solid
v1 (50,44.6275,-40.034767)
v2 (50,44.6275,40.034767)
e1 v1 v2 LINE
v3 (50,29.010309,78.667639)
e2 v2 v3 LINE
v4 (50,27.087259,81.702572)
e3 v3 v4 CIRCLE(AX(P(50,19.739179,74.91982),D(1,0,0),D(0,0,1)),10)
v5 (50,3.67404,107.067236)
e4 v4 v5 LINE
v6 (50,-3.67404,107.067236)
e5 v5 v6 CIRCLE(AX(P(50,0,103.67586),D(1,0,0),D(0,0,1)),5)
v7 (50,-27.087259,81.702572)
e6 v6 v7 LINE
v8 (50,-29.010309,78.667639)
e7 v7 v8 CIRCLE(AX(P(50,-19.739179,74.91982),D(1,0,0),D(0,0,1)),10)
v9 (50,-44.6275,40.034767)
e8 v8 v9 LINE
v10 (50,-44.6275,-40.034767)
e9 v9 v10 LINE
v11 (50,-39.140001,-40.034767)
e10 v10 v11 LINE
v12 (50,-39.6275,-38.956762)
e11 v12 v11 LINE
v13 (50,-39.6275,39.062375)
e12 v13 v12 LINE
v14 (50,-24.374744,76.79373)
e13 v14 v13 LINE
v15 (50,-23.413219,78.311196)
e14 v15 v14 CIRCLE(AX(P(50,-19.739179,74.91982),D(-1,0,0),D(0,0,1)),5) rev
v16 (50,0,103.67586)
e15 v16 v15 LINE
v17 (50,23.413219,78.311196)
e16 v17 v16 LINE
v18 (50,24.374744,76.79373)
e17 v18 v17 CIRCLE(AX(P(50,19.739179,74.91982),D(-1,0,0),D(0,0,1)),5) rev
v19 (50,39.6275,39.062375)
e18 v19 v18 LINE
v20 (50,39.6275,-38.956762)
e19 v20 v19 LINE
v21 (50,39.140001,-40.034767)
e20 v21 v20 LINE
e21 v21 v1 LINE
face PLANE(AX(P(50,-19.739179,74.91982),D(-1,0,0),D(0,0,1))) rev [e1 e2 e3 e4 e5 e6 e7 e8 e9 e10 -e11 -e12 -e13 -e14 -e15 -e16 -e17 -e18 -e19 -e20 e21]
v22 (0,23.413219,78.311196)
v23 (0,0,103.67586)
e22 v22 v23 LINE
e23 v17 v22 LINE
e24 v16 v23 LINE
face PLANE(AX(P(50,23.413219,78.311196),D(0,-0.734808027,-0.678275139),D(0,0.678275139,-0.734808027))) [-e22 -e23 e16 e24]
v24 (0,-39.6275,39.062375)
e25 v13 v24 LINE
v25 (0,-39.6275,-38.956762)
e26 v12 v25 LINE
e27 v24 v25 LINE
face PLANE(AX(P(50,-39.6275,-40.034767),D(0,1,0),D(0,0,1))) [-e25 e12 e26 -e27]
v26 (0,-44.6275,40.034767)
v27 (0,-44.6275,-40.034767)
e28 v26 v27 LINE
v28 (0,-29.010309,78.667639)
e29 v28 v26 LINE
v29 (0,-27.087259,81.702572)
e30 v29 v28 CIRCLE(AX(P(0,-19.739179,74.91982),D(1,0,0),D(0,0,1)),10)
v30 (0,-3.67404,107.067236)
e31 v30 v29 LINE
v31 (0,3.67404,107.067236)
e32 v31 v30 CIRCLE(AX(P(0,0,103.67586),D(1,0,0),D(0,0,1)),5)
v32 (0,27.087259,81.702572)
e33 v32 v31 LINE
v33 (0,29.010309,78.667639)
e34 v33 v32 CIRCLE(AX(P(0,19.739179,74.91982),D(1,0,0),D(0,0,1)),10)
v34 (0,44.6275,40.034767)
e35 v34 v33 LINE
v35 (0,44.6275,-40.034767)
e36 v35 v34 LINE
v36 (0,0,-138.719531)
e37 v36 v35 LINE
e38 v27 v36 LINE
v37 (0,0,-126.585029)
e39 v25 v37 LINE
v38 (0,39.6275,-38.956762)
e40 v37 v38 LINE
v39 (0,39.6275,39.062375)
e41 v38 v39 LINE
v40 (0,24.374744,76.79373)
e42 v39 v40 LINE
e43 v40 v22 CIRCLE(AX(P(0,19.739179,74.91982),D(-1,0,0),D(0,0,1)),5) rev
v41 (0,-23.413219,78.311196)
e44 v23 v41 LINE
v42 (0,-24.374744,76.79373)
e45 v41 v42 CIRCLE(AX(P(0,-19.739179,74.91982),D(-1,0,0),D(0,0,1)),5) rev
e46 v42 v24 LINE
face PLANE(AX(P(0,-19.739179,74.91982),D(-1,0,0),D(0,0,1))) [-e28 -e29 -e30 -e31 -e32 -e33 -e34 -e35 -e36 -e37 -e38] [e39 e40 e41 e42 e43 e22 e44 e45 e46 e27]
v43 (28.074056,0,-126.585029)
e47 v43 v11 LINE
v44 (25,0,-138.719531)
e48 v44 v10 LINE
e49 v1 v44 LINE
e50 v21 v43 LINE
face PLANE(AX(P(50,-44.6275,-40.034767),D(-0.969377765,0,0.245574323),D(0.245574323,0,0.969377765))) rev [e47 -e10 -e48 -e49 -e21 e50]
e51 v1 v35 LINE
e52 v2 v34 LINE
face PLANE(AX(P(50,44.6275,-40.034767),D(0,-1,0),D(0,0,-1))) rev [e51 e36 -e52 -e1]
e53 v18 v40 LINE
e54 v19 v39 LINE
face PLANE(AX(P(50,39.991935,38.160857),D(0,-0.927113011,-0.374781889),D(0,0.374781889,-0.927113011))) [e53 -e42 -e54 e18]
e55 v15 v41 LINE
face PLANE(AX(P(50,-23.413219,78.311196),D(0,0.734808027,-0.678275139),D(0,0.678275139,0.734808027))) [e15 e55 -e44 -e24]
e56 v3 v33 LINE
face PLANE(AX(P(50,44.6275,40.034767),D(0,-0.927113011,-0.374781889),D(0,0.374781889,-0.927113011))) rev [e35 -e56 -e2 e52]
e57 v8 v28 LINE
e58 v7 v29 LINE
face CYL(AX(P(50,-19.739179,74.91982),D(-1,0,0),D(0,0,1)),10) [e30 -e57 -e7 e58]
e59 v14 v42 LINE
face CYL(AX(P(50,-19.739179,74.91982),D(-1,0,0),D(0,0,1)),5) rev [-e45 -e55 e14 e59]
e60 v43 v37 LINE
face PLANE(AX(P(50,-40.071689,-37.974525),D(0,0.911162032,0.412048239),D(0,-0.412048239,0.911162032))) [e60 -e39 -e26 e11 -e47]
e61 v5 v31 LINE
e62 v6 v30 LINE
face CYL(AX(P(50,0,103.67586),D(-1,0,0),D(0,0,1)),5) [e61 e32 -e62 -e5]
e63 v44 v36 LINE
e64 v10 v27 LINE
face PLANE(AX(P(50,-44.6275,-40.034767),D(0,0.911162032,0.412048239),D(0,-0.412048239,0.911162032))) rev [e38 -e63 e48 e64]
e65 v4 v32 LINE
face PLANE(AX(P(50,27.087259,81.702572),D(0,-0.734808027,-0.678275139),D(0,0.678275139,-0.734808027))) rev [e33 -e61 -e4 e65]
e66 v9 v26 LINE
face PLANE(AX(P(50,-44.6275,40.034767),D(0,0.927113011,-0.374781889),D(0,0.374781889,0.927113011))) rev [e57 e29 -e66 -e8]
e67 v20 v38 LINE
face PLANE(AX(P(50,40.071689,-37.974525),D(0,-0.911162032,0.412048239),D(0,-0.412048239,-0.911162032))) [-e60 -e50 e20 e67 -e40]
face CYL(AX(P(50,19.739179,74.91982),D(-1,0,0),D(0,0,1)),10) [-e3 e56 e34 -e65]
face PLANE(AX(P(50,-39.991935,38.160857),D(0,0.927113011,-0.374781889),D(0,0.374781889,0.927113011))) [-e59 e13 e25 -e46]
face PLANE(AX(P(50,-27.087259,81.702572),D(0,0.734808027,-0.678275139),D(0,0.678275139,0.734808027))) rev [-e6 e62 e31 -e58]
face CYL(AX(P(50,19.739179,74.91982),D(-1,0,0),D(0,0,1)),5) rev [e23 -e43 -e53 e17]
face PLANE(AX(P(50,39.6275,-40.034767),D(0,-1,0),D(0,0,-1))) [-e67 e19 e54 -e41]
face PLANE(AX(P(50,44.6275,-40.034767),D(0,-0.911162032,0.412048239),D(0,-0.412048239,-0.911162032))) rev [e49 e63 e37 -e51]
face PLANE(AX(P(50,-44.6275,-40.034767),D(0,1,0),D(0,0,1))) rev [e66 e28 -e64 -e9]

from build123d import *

# Parameters (mm, degrees)
BOSS_EXTRUDE1_DEPTH = 50
SHELL1_DEPTH        = 50
CUT_EXTRUDE2_DEPTH  = 173.364622498


# Read off the part's stored shape, not the designer's step: Shell1
with BuildPart() as part:
    # Sketch1 → Boss-Extrude1 (new body)
    with BuildSketch(Plane.YZ):
        with BuildLine():
            Line((-44.627499653, -40.034766679), (-44.627499653, 40.034766679))
            Line((-44.627499653, 40.034766679), (-29.010308673, 78.667639283))
            ThreePointArc((-29.010308673, 78.667639283), (-28.186204205, 80.272180413), (-27.087258828, 81.702571783))
            Line((-27.087258828, 81.702571783), (-3.674040134, 107.06723584))
            ThreePointArc((-3.674040134, 107.06723584), (0, 108.675860147), (3.674040134, 107.06723584))
            Line((3.674040134, 107.06723584), (27.087258828, 81.702571783))
            ThreePointArc((27.087258828, 81.702571783), (28.186204205, 80.272180413), (29.010308673, 78.667639283))
            Line((29.010308673, 78.667639283), (44.627499653, 40.034766679))
            Line((44.627499653, 40.034766679), (44.627499653, -40.034766679))
            Line((44.627499653, -40.034766679), (0, -138.719530665))
            Line((0, -138.719530665), (-44.627499653, -40.034766679))
        make_face()
    extrude(amount=BOSS_EXTRUDE1_DEPTH)

    # Shell1 outline → Shell1 (cut)
    with BuildSketch(Plane.YZ):
        with BuildLine():
            Line((-24.374743616, 76.79372984), (-39.627499653, 39.062374592))
            Line((-39.627499653, 39.062374592), (-39.627499653, -38.956762217))
            Line((-39.627499653, -38.956762217), (0, -126.585029116))
            Line((0, -126.585029116), (39.627499653, -38.956762217))
            Line((39.627499653, -38.956762217), (39.627499653, 39.062374592))
            Line((39.627499653, 39.062374592), (24.374743616, 76.79372984))
            ThreePointArc((24.374743616, 76.79372984), (23.962691382, 77.596000405), (23.413218693, 78.31119609))
            Line((23.413218693, 78.31119609), (0, 103.675860147))
            Line((0, 103.675860147), (-23.413218693, 78.31119609))
            ThreePointArc((-23.413218693, 78.31119609), (-23.962691382, 77.596000405), (-24.374743616, 76.79372984))
        make_face()
    extrude(amount=SHELL1_DEPTH, mode=Mode.SUBTRACT)

    # Sketch3 → Cut-Extrude2 (cut, through all)
    with BuildSketch(Plane(origin=(0, 44.627499653, 0), x_dir=(-1, 0, 0), z_dir=(0, 1, 0))):
        Polygon((-50, -40.034766679), (-25, -138.719530665), (-50, -138.719530665), align=None)
    extrude(amount=-CUT_EXTRUDE2_DEPTH, mode=Mode.SUBTRACT)


solid = part.part
